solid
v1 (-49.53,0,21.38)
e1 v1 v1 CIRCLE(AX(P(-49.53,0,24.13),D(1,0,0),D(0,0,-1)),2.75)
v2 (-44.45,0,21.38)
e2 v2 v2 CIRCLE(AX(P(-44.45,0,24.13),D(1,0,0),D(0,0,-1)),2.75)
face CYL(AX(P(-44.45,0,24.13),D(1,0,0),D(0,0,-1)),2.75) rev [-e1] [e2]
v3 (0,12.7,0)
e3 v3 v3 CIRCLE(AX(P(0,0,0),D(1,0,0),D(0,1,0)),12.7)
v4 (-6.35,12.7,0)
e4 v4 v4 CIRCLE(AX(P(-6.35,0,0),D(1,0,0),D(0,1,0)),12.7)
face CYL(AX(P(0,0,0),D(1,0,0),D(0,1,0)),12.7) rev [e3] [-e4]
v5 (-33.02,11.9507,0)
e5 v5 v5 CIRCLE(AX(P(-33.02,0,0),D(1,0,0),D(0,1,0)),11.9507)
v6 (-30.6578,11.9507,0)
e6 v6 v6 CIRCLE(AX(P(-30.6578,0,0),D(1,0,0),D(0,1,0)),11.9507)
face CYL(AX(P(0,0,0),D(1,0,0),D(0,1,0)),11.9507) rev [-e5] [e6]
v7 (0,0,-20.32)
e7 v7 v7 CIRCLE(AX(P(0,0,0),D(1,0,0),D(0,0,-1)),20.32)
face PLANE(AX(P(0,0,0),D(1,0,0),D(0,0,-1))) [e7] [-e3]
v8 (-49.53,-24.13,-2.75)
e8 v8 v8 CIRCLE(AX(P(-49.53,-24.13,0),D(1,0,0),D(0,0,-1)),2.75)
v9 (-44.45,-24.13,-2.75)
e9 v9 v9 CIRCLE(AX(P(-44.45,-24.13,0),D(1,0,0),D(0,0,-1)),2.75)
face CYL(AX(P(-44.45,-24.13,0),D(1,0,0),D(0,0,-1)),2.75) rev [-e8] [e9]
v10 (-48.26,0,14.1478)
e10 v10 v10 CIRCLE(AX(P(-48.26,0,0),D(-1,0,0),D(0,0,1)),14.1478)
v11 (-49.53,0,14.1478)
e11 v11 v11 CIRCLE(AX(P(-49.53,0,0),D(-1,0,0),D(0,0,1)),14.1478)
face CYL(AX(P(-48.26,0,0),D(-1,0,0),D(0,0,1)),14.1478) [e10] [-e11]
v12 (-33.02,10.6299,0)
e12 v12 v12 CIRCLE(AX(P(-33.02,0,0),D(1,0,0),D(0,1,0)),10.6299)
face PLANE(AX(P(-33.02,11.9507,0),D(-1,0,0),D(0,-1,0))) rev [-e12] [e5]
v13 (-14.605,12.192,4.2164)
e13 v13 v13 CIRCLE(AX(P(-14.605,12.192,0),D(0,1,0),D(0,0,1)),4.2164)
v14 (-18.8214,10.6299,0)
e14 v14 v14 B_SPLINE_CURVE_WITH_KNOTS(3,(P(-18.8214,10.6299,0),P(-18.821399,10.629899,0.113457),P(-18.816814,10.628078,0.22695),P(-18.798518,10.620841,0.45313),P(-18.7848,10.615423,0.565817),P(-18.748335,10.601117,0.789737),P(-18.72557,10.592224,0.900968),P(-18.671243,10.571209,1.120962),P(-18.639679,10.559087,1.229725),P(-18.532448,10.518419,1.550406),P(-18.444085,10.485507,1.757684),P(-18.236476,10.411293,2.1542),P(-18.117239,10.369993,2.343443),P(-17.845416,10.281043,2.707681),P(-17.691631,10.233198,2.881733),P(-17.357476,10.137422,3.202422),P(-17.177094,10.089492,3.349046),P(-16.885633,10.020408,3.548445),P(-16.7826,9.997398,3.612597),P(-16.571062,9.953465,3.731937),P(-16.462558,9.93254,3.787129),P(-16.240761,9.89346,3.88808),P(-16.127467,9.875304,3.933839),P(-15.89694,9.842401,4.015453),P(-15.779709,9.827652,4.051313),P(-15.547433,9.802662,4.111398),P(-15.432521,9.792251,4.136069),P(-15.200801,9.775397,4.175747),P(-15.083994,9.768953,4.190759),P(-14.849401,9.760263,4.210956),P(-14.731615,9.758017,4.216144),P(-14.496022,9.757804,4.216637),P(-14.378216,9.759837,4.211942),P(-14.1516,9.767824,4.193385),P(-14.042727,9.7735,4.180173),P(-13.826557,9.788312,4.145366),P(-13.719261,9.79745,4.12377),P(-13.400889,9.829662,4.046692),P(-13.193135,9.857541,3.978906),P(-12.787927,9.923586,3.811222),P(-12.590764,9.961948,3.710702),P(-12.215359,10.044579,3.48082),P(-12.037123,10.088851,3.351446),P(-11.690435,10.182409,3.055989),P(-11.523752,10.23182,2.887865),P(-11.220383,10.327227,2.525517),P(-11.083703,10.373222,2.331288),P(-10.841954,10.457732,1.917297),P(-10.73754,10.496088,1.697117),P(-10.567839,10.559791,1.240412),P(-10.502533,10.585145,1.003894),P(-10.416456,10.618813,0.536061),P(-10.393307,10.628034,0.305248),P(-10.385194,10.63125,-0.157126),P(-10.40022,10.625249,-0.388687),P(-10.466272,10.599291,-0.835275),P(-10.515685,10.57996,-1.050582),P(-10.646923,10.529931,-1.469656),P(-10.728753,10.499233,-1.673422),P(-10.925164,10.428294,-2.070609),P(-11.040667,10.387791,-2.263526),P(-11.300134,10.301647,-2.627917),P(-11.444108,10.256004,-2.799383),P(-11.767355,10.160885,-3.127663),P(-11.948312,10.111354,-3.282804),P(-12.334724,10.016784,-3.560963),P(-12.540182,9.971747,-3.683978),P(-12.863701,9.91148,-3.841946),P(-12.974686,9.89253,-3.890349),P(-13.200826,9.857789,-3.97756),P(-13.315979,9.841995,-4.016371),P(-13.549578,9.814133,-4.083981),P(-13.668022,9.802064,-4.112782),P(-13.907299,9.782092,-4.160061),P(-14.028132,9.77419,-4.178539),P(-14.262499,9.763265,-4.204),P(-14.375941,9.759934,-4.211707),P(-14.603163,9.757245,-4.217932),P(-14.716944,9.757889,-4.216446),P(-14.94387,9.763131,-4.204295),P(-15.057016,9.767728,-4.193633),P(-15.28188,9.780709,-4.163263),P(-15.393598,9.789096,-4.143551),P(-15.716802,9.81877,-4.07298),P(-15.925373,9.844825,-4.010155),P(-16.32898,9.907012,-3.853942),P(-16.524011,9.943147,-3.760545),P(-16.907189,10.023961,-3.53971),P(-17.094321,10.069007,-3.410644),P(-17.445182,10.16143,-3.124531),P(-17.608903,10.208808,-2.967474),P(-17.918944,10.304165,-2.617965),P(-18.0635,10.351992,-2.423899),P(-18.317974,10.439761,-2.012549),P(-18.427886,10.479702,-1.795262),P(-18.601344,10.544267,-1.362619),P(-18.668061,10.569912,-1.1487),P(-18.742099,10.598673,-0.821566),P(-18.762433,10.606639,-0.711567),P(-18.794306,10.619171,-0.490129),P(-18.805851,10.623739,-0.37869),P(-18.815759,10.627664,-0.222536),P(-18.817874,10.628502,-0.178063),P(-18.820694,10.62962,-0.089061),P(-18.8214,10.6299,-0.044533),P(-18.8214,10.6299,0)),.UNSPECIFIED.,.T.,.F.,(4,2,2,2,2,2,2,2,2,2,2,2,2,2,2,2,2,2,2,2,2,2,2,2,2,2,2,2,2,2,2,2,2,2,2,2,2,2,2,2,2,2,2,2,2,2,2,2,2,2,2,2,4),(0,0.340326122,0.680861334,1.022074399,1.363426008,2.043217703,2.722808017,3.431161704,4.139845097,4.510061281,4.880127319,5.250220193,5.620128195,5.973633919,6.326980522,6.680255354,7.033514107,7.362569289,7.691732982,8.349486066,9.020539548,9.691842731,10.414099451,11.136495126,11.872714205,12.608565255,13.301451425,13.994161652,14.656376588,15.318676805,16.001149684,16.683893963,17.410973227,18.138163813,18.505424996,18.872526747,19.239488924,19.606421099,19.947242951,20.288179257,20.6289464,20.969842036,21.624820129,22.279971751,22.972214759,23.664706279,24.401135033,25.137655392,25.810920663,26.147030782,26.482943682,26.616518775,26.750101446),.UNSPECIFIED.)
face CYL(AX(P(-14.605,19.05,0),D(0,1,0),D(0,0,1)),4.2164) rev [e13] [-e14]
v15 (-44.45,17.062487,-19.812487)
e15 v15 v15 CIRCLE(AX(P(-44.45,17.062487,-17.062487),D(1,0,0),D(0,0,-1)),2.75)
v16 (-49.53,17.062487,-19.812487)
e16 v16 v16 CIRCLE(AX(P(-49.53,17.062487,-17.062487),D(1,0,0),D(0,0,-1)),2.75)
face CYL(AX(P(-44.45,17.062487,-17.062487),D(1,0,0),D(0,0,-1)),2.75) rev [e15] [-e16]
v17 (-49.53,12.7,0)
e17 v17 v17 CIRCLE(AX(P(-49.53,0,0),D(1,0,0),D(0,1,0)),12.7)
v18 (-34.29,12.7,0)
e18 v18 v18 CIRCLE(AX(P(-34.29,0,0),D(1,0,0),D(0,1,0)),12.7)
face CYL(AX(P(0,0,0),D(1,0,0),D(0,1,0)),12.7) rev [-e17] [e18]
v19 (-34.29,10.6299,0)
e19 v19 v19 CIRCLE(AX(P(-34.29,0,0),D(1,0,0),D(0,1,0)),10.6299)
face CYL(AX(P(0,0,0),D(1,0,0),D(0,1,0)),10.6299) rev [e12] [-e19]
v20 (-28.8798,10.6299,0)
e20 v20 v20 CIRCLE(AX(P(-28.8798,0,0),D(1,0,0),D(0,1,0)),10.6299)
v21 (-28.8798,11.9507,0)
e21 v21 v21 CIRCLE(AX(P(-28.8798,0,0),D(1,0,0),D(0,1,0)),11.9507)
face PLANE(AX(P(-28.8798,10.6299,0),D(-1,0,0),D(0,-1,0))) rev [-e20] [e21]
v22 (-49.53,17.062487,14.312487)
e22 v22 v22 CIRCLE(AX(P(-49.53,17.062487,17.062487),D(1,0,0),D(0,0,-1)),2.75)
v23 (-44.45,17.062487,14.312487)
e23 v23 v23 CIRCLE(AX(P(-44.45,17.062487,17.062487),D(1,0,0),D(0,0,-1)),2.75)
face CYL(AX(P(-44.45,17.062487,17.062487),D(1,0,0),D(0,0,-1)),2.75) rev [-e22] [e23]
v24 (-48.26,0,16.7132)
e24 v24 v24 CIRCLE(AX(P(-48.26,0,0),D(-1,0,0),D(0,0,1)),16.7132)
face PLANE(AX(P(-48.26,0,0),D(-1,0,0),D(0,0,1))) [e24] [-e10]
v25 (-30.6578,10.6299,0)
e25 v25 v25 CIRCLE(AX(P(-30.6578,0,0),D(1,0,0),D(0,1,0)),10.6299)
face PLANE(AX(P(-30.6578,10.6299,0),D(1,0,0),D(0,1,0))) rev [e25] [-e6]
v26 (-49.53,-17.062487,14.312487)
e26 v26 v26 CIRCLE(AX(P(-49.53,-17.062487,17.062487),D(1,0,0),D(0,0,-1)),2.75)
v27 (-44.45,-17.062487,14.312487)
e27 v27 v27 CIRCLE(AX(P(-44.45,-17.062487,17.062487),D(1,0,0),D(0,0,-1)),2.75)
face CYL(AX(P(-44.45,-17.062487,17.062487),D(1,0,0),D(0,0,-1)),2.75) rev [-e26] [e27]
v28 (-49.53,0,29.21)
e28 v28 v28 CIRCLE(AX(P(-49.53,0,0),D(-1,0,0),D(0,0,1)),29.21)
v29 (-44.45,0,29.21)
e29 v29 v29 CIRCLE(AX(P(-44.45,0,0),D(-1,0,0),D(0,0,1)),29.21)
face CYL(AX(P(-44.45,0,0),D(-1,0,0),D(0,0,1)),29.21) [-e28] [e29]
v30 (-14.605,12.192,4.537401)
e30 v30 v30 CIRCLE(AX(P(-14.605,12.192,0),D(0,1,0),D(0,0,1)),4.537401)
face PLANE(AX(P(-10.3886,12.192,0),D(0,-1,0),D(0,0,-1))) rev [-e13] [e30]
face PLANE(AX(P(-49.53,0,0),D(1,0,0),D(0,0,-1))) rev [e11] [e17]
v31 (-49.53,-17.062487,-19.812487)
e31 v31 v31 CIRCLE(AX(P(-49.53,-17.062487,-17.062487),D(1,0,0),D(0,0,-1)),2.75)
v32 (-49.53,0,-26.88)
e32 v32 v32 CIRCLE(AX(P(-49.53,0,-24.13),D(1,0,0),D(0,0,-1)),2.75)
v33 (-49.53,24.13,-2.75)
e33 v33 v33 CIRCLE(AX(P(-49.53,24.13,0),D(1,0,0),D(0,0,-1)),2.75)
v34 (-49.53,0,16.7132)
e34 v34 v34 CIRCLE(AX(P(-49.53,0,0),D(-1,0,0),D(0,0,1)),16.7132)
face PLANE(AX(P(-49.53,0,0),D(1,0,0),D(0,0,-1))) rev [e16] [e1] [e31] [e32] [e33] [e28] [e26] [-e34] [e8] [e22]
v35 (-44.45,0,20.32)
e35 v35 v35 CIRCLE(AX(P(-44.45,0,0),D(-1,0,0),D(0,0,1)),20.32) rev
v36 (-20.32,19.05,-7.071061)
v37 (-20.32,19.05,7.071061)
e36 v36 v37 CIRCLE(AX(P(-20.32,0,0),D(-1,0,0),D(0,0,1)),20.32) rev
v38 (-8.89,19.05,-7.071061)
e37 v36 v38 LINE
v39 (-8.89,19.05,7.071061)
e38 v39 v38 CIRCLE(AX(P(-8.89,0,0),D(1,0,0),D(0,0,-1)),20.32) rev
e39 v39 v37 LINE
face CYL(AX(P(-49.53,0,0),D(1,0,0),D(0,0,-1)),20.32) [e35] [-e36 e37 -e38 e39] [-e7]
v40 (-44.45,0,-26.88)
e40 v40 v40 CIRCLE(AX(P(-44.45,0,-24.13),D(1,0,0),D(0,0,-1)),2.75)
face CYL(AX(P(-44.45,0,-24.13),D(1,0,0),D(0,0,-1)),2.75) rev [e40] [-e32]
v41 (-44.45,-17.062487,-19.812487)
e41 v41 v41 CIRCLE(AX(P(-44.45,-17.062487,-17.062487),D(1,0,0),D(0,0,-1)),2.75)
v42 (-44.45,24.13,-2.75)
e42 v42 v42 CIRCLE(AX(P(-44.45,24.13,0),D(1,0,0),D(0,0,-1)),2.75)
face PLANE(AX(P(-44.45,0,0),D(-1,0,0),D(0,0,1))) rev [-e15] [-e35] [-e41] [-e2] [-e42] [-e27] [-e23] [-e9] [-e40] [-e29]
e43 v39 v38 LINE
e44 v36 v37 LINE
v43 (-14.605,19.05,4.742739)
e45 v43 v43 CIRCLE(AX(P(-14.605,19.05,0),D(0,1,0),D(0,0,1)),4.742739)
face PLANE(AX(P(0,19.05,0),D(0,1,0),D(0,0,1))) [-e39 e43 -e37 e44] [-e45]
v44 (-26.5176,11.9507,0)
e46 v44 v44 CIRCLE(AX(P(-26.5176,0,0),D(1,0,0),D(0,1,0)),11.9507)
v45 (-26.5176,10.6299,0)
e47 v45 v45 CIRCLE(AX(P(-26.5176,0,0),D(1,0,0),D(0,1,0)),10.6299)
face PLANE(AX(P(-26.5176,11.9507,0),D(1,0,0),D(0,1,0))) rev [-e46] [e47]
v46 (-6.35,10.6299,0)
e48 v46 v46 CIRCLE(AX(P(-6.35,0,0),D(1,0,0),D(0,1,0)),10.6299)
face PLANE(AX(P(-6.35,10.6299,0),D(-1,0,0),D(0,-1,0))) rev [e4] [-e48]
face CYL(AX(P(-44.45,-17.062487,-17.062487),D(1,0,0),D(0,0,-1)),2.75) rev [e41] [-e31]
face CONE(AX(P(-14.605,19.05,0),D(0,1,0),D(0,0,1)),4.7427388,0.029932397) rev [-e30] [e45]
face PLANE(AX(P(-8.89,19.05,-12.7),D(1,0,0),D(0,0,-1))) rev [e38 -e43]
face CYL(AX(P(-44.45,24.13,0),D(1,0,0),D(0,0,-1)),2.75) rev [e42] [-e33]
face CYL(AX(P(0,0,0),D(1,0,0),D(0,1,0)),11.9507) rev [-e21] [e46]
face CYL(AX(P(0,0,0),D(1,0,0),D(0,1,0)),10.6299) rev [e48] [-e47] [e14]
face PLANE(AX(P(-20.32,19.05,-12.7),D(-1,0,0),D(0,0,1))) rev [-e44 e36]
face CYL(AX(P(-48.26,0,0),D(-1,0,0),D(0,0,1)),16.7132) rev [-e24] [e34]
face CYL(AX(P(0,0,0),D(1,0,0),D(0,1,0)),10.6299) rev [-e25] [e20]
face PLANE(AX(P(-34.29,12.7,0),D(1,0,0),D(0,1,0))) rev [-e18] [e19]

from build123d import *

# Parameters (mm, degrees)
SKETCH2_R                = 20.32
BOSS_EXTRUDE1_DEPTH      = 49.53
SKETCH3_R                = 29.21
SKETCH3_R_2              = 19.05
BOSS_EXTRUDE2_DEPTH      = 5.08
M5_CLEARANCE_HOLE1_D     = 5.5
M5_CLEARANCE_HOLE1_DEPTH = 5.08
SKETCH6_W                = 11.43
SKETCH6_H                = 25.4
CUT_EXTRUDE1_DEPTH       = 1.27
SKETCH9_R                = 16.7132
SKETCH9_R_2              = 14.1478
CUT_EXTRUDE2_DEPTH       = 1.27


# Read off the part's stored shape, not the designer's step: 1/8 NPT Tapped Hole1
with BuildPart() as part:
    # Sketch2 → Boss-Extrude1 (new body)
    with BuildSketch(Plane(origin=(0, 0, 0), x_dir=(0, 0, -1), z_dir=(1, 0, 0))):
        Circle(SKETCH2_R)
    extrude(amount=-BOSS_EXTRUDE1_DEPTH)

    # Sketch1 → Cut-Revolve1 (revolve, cut)
    with BuildSketch(Plane.XY):
        Polygon((-30.6578, 10.6299), (-30.6578, 11.9507), (-33.02, 11.9507), (-33.02, 10.6299), (-34.29, 10.6299), (-34.29, 12.7), (-49.53, 12.7), (-49.53, 0), (0, 0), (0, 12.7), (-6.35, 12.7), (-6.35, 10.6299), (-26.5176, 10.6299), (-26.5176, 11.9507), (-28.8798, 11.9507), (-28.8798, 10.6299), align=None)
    revolve(axis=Axis((0, 0, 0), (-1, 0, 0)), mode=Mode.SUBTRACT)

    # Sketch3 → Boss-Extrude2 (add)
    with BuildSketch(Plane.ZY.offset(49.53)):
        Circle(SKETCH3_R)
        Circle(SKETCH3_R_2, mode=Mode.SUBTRACT)
    extrude(amount=-BOSS_EXTRUDE2_DEPTH)

    # M5 Clearance Hole1
    with Locations(Plane(origin=(-44.45, 0, 0), x_dir=(0, 0, -1), z_dir=(1, 0, 0))):
        with Locations((0, 24.13), (0, 0), (17.06248663, 17.06248663), (24.13, 0), (17.06248663, -17.06248663), (0, -24.13), (-17.06248663, -17.06248663), (-24.13, 0), (-17.06248663, 17.06248663)):
            Hole(M5_CLEARANCE_HOLE1_D / 2, depth=M5_CLEARANCE_HOLE1_DEPTH)

    # Sketch6 → Cut-Extrude1 (cut)
    with BuildSketch(Plane(origin=(0, 20.32, 0), x_dir=(1, 0, 0), z_dir=(0, 1, 0))):
        with Locations((-14.605, 0)):
            Rectangle(SKETCH6_W, SKETCH6_H)
    extrude(amount=-CUT_EXTRUDE1_DEPTH, mode=Mode.SUBTRACT)

    # 1/8 NPT Tapped Hole1 outline → 1/8 NPT Tapped Hole1 (revolve, cut)
    with BuildSketch(Plane(origin=(-14.605, 0, 0), x_dir=(1, 0, 0), z_dir=(0, 0, 1))):
        Polygon((0, 9.757655132), (4.2164, 9.757655132), (4.2164, 12.192), (4.537401096, 12.192), (4.7427388, 19.05), (0, 19.05), align=None)
    revolve(axis=Axis((-14.605, 0, 0), (0, 1, 0)), mode=Mode.SUBTRACT)

    # Sketch9 → Cut-Extrude2 (cut)
    with BuildSketch(Plane.ZY.offset(49.53)):
        Circle(SKETCH9_R)
        Circle(SKETCH9_R_2, mode=Mode.SUBTRACT)
    extrude(amount=-CUT_EXTRUDE2_DEPTH, mode=Mode.SUBTRACT)


solid = part.part
